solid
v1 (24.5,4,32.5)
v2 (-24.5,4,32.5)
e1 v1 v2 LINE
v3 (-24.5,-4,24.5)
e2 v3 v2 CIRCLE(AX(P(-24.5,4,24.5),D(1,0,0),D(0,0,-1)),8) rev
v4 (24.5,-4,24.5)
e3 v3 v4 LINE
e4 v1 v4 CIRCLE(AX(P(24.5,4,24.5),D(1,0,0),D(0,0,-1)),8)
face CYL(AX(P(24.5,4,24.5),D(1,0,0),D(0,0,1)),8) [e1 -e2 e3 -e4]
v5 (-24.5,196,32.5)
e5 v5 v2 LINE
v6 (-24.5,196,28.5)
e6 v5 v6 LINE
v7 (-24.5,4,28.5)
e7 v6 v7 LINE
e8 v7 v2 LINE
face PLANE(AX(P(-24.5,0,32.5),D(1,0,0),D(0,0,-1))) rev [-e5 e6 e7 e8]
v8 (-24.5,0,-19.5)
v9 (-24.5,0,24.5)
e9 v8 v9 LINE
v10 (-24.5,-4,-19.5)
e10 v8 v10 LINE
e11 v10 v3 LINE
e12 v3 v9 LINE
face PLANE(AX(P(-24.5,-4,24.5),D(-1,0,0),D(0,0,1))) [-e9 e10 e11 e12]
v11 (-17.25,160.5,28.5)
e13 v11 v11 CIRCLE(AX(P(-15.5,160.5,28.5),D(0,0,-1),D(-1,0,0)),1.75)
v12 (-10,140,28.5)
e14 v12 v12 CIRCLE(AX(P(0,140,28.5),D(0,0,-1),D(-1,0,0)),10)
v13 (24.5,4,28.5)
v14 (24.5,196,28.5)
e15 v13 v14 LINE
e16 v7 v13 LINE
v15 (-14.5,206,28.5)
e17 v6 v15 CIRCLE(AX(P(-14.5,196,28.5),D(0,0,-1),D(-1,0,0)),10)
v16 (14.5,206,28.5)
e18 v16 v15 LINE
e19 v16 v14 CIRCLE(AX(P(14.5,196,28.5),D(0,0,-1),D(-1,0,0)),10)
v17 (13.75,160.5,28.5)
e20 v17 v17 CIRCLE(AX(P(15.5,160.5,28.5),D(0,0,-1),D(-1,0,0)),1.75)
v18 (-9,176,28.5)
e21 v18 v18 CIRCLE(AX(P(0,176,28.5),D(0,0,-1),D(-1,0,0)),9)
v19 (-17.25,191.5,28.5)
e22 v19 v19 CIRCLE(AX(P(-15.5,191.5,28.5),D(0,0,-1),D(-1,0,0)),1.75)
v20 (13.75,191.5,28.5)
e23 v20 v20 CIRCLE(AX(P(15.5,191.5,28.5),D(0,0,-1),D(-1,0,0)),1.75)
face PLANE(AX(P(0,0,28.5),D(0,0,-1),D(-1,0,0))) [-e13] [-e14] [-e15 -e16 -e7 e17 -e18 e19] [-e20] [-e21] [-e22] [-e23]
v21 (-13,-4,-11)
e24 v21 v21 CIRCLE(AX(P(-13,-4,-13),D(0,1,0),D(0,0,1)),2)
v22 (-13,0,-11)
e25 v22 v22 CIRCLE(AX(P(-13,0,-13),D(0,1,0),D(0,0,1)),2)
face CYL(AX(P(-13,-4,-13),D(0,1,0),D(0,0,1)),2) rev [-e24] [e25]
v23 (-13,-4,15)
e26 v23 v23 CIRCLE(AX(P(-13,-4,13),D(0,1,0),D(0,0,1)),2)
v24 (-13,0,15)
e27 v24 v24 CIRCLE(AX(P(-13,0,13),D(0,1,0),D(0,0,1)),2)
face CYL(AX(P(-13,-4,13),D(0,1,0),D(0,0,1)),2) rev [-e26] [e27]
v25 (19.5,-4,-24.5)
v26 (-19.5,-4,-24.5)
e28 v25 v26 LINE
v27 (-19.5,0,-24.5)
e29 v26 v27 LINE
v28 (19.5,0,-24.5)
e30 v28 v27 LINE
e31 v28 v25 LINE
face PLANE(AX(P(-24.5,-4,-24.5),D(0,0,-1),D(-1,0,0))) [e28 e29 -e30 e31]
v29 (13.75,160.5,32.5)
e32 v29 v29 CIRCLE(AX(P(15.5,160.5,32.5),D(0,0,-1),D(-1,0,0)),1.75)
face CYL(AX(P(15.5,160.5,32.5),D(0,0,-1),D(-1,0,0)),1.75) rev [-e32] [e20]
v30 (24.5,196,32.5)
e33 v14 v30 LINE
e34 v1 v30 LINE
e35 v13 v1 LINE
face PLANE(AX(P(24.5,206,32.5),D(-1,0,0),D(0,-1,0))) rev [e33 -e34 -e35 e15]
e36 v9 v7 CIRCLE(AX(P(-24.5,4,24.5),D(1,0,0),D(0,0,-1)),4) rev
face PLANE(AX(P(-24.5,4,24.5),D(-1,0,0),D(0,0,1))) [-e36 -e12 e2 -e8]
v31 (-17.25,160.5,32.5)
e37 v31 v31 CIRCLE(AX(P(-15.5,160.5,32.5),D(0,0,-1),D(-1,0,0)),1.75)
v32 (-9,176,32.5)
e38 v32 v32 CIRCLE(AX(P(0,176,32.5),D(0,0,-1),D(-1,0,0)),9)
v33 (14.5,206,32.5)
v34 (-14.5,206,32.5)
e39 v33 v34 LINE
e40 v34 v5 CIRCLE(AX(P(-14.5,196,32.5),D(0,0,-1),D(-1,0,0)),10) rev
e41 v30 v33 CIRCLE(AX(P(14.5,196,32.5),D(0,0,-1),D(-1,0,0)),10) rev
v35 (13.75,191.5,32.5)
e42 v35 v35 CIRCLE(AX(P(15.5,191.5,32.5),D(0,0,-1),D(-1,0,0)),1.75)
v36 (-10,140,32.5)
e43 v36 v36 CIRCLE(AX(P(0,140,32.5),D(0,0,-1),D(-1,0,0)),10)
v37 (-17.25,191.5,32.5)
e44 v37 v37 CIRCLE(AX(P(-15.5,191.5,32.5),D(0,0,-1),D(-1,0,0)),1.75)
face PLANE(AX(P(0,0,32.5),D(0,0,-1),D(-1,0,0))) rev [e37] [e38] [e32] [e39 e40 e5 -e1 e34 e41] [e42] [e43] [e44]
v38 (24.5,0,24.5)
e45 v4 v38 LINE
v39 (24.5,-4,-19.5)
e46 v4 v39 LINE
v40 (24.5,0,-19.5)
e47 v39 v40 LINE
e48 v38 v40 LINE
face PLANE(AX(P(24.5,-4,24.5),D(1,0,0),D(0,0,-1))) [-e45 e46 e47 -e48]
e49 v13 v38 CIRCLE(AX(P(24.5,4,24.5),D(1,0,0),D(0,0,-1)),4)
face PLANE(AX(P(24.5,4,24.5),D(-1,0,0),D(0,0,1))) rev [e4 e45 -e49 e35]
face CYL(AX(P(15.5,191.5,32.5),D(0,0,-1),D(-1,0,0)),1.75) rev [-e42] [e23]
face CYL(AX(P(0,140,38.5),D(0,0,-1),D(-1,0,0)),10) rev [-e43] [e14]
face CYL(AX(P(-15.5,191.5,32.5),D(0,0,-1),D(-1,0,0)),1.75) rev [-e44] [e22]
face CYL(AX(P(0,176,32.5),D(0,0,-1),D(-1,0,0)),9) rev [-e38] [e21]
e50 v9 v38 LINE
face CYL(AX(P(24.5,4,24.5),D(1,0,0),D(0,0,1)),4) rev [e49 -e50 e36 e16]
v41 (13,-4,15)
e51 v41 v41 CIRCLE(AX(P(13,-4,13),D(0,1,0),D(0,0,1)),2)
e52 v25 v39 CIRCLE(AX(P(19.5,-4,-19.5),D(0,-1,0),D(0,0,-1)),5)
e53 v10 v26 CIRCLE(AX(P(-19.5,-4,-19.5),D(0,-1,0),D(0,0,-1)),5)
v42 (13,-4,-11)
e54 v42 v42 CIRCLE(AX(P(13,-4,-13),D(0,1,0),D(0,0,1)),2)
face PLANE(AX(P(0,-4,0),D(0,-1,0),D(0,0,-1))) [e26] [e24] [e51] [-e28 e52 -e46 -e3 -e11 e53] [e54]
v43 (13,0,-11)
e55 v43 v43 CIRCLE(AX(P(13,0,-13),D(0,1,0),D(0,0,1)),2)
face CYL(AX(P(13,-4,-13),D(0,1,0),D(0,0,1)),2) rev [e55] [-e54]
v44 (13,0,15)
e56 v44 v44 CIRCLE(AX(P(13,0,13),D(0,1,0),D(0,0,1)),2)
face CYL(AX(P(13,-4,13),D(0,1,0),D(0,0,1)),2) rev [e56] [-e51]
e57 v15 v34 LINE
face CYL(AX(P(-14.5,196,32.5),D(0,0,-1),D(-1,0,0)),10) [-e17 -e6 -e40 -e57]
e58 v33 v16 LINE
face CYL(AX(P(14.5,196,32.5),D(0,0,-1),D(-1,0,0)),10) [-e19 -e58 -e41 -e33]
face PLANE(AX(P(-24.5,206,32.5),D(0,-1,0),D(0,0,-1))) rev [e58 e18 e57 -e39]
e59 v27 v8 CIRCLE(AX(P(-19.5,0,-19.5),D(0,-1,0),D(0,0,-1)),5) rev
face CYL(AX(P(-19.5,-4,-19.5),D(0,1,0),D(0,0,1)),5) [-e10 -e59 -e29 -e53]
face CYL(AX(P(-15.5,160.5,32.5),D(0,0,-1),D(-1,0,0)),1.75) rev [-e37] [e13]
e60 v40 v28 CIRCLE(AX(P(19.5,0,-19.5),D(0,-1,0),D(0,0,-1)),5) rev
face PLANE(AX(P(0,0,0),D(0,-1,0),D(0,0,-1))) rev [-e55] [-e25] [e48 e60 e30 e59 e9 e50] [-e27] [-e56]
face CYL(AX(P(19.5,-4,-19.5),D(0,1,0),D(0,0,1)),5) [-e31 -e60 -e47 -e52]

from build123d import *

# Parameters (mm, degrees)
SKETCH1_W          = 49
SKETCH1_H          = 49
SKETCH1_R          = 2
BASE_FLANGE1_DEPTH = 4
EDGE_FLANGE1_DEPTH = 49
SKETCH9_R          = 10
CUT_EXTRUDE1_DEPTH = 10
SKETCH10_R         = 9
SKETCH10_R_2       = 10
SKETCH10_R_3       = 1.75
CUT_EXTRUDE2_DEPTH = 215.115039173
FILLET1_R          = 10
FILLET2_R          = 5


# Sheet-metal steps are written as plain solids
with BuildPart() as part:
    # Sketch1 → Base-Flange1 (new body)
    with BuildSketch(Plane(origin=(0, 0, 0), x_dir=(1, 0, 0), z_dir=(0, 1, 0))):
        Rectangle(SKETCH1_W, SKETCH1_H)
        with Locations(Location((-13, -13, 0), (0, 0, 270))):
            Circle(SKETCH1_R, mode=Mode.SUBTRACT)
        with Locations(Location((-13, 13, 0), (0, 0, 270))):
            Circle(SKETCH1_R, mode=Mode.SUBTRACT)
        with Locations(Location((13, 13, 0), (0, 0, 270))):
            Circle(SKETCH1_R, mode=Mode.SUBTRACT)
        with Locations(Location((13, -13, 0), (0, 0, 270))):
            Circle(SKETCH1_R, mode=Mode.SUBTRACT)
    extrude(amount=-BASE_FLANGE1_DEPTH)

    # Edge-Flange1 section (across the edge) → Edge-Flange1 (add)
    with BuildSketch(Plane(origin=(-24.5, 0, 28.5), x_dir=(0, 0, -1), z_dir=(1, 0, 0))):
        with BuildLine():
            Line((-4, 4), (-4, 206))
            Line((-4, 206), (0, 206))
            Line((0, 206), (0, 4))
            ThreePointArc((0, 4), (1.171572875, 1.171572875), (4, 0))
            Line((4, 0), (4, -4))
            ThreePointArc((4, -4), (-1.656854249, -1.656854249), (-4, 4))
        make_face()
    extrude(amount=EDGE_FLANGE1_DEPTH)

    # Sketch9 → Cut-Extrude1 (cut)
    with BuildSketch(Plane(origin=(0, 0, 28.5), x_dir=(-1, 0, 0), z_dir=(0, 0, -1))):
        with Locations((0, 140)):
            Circle(SKETCH9_R)
    extrude(amount=-CUT_EXTRUDE1_DEPTH, mode=Mode.SUBTRACT)

    # Sketch10 → Cut-Extrude2 (cut, through all)
    with BuildSketch(Plane(origin=(0, 0, 28.5), x_dir=(-1, 0, 0), z_dir=(0, 0, -1))):
        with Locations((0, 176)):
            Circle(SKETCH10_R)
        with Locations((0, 140)):
            Circle(SKETCH10_R_2)
        with Locations((-15.5, 160.5)):
            Circle(SKETCH10_R_3)
        with Locations((-15.5, 191.5)):
            Circle(SKETCH10_R_3)
        with Locations((15.5, 191.5)):
            Circle(SKETCH10_R_3)
        with Locations((15.5, 160.5)):
            Circle(SKETCH10_R_3)
    extrude(amount=-CUT_EXTRUDE2_DEPTH, mode=Mode.SUBTRACT)

    # Fillet1
    fillet1_edges = [part.edges().sort_by_distance(p)[0] for p in [
        (-24.5, 206, 30.5),
        (24.5, 206, 30.5),
    ]]
    fillet(fillet1_edges, radius=FILLET1_R)

    # Fillet2
    fillet2_edges = [part.edges().sort_by_distance(p)[0] for p in [
        (-24.5, -2, -24.5),
        (24.5, -2, -24.5),
    ]]
    fillet(fillet2_edges, radius=FILLET2_R)


solid = part.part
